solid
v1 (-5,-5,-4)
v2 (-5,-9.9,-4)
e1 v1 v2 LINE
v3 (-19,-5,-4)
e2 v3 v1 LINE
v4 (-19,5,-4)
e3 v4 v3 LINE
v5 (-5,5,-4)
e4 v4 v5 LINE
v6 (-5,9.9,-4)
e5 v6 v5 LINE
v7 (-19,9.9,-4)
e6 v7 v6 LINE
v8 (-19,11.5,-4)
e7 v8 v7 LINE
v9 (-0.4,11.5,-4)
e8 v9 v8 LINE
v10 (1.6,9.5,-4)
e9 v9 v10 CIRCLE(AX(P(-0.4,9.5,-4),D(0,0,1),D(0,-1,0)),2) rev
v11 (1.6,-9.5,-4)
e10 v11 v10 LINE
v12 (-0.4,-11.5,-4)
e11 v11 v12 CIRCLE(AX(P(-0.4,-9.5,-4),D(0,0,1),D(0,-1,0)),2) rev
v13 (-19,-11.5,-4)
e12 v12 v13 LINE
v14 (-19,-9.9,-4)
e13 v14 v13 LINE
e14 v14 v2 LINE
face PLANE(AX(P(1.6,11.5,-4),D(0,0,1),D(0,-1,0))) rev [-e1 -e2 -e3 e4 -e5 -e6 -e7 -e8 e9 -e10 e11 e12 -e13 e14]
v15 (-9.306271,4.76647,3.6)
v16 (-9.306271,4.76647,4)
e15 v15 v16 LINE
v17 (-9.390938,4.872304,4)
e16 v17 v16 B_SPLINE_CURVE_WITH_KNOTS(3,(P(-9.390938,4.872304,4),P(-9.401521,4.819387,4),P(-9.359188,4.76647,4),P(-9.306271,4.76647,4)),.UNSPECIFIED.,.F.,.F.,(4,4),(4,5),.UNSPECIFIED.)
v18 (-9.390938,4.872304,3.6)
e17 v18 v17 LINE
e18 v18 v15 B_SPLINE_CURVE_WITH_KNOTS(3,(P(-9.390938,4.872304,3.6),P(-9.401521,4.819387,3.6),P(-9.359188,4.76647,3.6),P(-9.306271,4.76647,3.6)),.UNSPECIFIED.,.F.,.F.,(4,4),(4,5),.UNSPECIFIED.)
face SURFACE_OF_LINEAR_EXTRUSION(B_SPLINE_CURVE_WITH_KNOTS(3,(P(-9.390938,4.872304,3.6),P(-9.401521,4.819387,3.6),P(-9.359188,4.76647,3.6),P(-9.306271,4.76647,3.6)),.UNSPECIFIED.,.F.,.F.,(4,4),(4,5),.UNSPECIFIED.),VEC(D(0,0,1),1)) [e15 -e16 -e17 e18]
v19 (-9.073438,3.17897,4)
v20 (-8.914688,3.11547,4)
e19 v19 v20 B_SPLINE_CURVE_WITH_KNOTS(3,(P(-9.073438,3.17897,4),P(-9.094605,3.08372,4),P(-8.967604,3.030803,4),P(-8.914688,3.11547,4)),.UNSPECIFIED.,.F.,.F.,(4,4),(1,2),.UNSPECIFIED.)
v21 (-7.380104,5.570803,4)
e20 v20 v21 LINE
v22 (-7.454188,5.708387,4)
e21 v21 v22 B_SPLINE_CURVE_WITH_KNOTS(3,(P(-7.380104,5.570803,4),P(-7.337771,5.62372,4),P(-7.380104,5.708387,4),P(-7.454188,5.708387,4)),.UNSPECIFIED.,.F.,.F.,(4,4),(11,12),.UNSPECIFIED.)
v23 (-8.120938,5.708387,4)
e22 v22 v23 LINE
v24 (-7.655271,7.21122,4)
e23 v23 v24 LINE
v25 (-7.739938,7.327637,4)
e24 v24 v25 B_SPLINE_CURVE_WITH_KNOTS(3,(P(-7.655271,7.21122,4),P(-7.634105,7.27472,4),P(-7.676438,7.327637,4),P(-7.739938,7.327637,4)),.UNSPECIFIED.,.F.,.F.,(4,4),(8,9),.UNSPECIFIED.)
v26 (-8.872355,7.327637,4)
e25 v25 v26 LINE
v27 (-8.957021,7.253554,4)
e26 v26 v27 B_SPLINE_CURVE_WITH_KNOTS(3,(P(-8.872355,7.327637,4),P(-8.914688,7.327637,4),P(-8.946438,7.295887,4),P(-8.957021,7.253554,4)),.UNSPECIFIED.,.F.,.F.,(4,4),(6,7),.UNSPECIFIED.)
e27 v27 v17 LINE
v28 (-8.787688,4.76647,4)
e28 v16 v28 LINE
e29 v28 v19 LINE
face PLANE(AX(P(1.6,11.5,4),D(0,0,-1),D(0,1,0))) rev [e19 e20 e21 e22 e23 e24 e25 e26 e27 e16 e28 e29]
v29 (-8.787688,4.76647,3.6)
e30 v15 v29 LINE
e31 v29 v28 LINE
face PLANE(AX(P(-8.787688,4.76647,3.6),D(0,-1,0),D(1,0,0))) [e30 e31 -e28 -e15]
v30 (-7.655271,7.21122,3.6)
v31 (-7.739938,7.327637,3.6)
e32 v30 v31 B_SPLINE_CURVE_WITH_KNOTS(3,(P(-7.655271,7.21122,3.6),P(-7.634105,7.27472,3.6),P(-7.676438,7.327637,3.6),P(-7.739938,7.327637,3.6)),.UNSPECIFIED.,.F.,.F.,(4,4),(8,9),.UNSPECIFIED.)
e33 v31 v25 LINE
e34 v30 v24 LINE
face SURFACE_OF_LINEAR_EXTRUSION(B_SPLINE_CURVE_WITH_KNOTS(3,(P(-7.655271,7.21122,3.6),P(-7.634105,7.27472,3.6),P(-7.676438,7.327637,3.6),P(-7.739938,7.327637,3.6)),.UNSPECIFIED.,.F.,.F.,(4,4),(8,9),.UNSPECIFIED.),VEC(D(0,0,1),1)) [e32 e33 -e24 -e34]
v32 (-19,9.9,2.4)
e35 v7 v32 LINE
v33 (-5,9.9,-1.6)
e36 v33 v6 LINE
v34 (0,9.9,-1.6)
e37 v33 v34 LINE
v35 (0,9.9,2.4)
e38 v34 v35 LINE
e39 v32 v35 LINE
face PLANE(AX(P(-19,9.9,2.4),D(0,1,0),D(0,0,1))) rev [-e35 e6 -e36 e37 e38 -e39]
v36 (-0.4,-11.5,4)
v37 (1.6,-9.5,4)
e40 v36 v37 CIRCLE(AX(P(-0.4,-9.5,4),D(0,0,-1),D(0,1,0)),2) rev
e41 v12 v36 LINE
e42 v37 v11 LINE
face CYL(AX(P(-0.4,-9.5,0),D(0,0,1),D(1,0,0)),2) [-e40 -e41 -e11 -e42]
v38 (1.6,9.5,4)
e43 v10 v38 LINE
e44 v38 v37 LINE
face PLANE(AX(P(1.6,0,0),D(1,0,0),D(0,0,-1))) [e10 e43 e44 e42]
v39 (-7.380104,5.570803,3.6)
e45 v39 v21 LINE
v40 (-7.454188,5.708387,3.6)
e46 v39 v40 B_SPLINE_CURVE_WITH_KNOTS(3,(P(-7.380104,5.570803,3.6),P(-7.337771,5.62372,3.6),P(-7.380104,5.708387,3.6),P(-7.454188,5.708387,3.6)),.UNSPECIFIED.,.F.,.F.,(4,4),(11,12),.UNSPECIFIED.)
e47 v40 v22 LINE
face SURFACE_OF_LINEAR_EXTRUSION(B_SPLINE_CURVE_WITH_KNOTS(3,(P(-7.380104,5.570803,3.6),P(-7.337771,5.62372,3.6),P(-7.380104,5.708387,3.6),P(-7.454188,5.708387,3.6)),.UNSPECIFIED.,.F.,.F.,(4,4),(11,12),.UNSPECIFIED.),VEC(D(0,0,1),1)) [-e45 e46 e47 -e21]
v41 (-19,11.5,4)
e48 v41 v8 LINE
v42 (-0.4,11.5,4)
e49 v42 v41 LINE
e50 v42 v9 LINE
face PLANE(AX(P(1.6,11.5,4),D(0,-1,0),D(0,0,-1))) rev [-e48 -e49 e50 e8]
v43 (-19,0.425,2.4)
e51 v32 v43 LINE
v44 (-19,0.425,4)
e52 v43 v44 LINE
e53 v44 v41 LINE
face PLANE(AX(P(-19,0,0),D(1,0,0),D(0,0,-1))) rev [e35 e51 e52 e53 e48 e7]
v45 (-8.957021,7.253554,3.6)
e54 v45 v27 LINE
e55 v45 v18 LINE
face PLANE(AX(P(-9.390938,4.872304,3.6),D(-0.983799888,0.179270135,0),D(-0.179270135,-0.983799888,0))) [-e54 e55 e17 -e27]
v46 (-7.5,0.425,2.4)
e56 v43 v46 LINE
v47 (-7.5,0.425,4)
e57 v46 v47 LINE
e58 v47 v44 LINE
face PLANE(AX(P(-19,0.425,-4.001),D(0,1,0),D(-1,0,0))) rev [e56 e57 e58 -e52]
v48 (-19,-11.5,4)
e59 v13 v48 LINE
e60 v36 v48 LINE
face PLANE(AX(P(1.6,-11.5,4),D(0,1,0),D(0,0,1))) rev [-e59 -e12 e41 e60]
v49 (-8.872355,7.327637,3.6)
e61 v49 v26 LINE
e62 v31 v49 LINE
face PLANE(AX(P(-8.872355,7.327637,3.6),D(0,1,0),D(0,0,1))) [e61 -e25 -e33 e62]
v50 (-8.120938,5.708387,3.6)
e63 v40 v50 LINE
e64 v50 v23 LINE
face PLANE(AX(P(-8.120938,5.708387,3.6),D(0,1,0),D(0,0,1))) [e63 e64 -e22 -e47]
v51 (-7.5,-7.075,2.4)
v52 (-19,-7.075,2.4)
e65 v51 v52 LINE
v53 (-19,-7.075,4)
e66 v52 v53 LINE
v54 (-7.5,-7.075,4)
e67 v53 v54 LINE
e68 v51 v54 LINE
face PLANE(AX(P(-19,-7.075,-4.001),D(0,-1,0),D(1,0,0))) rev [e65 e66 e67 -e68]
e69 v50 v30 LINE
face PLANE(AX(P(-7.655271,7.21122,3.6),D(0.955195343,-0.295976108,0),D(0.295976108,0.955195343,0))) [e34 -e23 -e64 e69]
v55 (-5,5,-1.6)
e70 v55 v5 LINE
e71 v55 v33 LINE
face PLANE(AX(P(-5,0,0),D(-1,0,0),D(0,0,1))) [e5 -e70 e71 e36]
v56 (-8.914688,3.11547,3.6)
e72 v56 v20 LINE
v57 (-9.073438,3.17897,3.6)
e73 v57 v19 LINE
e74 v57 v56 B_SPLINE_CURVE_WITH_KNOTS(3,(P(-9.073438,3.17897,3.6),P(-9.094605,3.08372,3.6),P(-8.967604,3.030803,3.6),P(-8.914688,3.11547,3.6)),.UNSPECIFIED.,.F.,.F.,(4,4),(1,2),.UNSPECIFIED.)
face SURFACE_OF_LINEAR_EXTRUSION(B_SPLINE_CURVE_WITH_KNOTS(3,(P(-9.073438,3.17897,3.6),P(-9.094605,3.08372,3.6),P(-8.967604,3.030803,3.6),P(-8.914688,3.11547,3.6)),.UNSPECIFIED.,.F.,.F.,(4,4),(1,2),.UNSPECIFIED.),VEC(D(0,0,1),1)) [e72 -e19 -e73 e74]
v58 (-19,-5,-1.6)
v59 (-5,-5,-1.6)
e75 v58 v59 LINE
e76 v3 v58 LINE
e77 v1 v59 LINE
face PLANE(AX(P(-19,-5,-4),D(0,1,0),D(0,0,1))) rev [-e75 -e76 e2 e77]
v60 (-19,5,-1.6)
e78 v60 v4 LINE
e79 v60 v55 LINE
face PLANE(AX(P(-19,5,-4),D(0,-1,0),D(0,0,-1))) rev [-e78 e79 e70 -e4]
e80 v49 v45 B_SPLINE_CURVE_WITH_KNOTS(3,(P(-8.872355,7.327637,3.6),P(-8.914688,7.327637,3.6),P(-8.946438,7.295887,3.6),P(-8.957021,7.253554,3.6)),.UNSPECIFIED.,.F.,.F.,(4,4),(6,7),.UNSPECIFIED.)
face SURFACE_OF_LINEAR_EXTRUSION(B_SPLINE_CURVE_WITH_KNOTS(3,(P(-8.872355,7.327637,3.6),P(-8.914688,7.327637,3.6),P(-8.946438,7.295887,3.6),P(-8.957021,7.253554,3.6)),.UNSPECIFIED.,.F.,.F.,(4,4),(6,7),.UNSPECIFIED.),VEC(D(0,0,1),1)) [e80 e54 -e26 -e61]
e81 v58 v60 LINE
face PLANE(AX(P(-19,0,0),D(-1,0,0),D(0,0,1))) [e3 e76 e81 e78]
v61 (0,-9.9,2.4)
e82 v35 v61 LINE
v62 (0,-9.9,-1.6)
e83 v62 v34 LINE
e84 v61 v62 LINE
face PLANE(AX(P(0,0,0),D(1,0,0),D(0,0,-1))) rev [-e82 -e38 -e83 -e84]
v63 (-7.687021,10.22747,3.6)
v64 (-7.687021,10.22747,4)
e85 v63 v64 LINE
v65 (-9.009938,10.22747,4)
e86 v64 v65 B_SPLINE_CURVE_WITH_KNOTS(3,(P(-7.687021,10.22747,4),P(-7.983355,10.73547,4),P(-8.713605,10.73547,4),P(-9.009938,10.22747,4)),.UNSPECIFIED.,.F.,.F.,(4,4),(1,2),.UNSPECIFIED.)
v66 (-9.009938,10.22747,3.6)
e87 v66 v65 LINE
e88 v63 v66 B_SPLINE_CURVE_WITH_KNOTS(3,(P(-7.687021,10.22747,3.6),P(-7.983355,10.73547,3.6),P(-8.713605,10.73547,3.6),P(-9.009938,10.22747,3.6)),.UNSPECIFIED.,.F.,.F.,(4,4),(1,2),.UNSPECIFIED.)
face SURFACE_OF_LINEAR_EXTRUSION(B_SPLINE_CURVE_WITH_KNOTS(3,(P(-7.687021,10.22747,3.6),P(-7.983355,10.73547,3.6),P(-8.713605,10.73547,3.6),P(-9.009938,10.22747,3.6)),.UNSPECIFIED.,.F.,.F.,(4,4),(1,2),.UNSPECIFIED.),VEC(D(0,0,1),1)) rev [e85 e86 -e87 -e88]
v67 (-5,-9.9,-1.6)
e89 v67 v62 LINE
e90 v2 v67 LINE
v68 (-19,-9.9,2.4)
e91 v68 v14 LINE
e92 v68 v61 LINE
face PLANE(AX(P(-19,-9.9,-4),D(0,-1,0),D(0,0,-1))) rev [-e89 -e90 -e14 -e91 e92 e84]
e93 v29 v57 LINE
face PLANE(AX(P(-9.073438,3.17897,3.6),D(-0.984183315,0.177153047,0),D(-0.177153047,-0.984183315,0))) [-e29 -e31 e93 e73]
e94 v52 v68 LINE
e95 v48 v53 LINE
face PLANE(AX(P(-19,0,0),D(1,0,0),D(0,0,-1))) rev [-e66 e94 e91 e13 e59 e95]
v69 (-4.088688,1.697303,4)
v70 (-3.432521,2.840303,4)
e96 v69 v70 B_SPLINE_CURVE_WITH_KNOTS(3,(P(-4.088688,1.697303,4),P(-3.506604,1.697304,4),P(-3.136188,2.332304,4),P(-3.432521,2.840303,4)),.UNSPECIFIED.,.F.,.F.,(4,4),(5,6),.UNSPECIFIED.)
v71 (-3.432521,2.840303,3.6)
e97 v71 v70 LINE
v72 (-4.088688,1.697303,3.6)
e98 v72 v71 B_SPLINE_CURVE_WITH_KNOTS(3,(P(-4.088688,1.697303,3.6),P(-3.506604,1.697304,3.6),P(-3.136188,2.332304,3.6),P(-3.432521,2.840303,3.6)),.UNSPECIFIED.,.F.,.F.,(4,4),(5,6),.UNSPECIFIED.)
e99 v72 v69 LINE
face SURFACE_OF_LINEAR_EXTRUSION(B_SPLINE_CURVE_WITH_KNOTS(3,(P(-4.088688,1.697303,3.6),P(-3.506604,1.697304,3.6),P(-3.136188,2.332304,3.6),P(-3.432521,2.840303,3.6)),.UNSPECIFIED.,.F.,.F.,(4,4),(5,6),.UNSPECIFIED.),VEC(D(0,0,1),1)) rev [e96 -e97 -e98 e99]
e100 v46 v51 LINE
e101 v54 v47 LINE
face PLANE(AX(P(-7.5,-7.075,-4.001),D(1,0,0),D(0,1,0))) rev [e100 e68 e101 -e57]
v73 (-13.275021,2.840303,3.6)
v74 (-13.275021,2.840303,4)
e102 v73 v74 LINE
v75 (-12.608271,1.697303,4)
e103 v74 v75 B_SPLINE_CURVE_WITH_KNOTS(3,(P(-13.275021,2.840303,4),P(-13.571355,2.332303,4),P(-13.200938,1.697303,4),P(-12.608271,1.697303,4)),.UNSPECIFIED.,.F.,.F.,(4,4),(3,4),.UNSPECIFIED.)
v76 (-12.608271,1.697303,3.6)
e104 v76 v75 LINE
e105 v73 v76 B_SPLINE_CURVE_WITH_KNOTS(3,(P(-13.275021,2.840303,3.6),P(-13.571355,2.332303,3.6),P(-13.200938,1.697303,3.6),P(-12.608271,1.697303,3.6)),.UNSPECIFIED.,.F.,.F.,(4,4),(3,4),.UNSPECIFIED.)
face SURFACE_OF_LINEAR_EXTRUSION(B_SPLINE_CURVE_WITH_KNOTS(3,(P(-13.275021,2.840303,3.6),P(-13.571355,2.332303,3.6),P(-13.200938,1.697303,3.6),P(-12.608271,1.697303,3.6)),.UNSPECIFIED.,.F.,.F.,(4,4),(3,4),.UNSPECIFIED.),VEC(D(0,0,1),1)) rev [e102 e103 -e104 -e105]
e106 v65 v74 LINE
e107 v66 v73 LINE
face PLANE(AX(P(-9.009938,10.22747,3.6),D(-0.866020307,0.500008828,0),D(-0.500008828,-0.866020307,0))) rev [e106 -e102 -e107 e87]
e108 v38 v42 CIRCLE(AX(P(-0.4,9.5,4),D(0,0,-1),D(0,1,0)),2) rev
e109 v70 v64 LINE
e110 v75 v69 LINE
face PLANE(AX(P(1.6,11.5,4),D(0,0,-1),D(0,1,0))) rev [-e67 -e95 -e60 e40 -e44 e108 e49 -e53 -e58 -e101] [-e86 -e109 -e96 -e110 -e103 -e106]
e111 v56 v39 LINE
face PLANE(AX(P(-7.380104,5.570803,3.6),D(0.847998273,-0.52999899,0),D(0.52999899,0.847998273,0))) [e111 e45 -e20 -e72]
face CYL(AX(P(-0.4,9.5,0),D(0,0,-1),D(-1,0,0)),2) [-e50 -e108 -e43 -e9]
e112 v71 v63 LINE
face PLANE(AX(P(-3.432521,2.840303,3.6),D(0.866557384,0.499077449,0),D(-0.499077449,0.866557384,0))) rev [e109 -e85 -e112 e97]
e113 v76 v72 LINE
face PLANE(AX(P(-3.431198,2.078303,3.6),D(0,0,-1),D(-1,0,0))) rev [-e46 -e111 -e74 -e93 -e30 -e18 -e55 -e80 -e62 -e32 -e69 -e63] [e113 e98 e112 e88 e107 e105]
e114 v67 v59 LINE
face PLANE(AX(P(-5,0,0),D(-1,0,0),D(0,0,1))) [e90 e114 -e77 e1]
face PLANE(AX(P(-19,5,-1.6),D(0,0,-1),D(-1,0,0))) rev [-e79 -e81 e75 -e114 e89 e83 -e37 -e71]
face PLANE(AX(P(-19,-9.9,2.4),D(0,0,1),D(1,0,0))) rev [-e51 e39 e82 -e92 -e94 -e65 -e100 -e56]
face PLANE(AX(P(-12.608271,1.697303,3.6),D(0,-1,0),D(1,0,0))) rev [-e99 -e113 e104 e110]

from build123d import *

# Parameters (mm, degrees)
ESQUISSE1_W             = 8
ESQUISSE1_H             = 23
BOSS_EXTRU_1_DEPTH      = 1.6
ESQUISSE2_W             = 2.4
ESQUISSE2_H             = 10
BOSS_EXTRU_2_DEPTH      = 19
ESQUISSE3_W             = 2.4
ESQUISSE3_H             = 19.8
BOSS_EXTRU_3_DEPTH      = 5
ENL_V_MAT_EXTRU_1_REACH = 25.606
ESQUISSE4_W             = 11.5
ESQUISSE4_H             = 7.5
ENL_V_START             = -0.4
ENL_V_MAT_EXTRU_2_DEPTH = 0.4
CONG_1_R                = 2


# Read off the part's stored shape, not the designer's step: Enlèv. mat.-Extru.2
with BuildPart() as part:
    # Esquisse1 → Boss.-Extru.1 (new body)
    with BuildSketch(Plane(origin=(0, 0, 0), x_dir=(0, 0, -1), z_dir=(1, 0, 0))):
        Rectangle(ESQUISSE1_W, ESQUISSE1_H)
    extrude(amount=BOSS_EXTRU_1_DEPTH)

    # Esquisse2 → Boss.-Extru.2 (add)
    with BuildSketch(Plane.ZY):
        Polygon((-4, 11.5), (4, 11.5), (4, -11.5), (-4, -11.5), (-4, -9.9), (2.4, -9.9), (2.4, 9.9), (-4, 9.9), align=None)
        with Locations((-2.8, 0)):
            Rectangle(ESQUISSE2_W, ESQUISSE2_H)
    extrude(amount=BOSS_EXTRU_2_DEPTH)

    # Esquisse3 → Boss.-Extru.3 (add)
    with BuildSketch(Plane.ZY):
        with Locations((-2.8, 0)):
            Rectangle(ESQUISSE3_W, ESQUISSE3_H)
    extrude(amount=BOSS_EXTRU_3_DEPTH)

    # Esquisse4 → Enlèv. mat.-Extru.1 (cut, up to next)
    with BuildSketch(Plane.XY.offset(4), mode=Mode.PRIVATE) as enl_v_mat_extru_1_sk1:
        with Locations((-13.25, -3.325)):
            Rectangle(ESQUISSE4_W, ESQUISSE4_H)
    enl_v_mat_extru_1_tool1 = extrude(enl_v_mat_extru_1_sk1.sketch, amount=-ENL_V_MAT_EXTRU_1_REACH, mode=Mode.PRIVATE) & part.part
    add(enl_v_mat_extru_1_tool1.solids().sort_by_distance((-13.25, -3.325, 4))[0], mode=Mode.SUBTRACT)

    # Enlèv. mat.-Extru.2 outline → Enlèv. mat.-Extru.2 (cut)
    with BuildSketch(Plane.XY.offset(4).offset(ENL_V_START)):
        with BuildLine():
            Line((-12.608271193, 1.69730271), (-4.088687559, 1.69730271))
            add(Edge.make_bspline(
                [(-4.088687559, 1.69730271), (-3.506604225, 1.697303518), (-3.136187559, 2.332303518), (-3.432521215, 2.840303033)],
                knots=[5, 5, 5, 5, 6, 6, 6, 6], degree=3))
            Line((-3.432521215, 2.840303033), (-7.687021295, 10.227470021))
            add(Edge.make_bspline(
                [(-7.687021295, 10.227470021), (-7.983354547, 10.735470041), (-8.713604709, 10.735470041), (-9.009937961, 10.227470021)],
                knots=[1, 1, 1, 1, 2, 2, 2, 2], degree=3))
            Line((-9.009937961, 10.227470021), (-13.275021213, 2.840303033))
            add(Edge.make_bspline(
                [(-13.275021213, 2.840303033), (-13.571354541, 2.33230271), (-13.200937899, 1.69730271), (-12.608271193, 1.69730271)],
                knots=[3, 3, 3, 3, 4, 4, 4, 4], degree=3))
        make_face()
        with BuildLine():
            add(Edge.make_bspline(
                [(-7.380104467, 5.570803355), (-7.337771376, 5.623720022), (-7.380104467, 5.708386608), (-7.454188284, 5.708387012)],
                knots=[11, 11, 11, 11, 12, 12, 12, 12], degree=3))
            Line((-7.380104467, 5.570803355), (-8.9146878, 3.115470345))
            add(Edge.make_bspline(
                [(-9.0734378, 3.178970184), (-9.094604547, 3.083720023), (-8.967604466, 3.030803356), (-8.9146878, 3.115470345)],
                knots=[1, 1, 1, 1, 2, 2, 2, 2], degree=3))
            Line((-9.0734378, 3.178970184), (-8.787687719, 4.766470184))
            Line((-8.787687719, 4.766470184), (-9.306271214, 4.766470184))
            add(Edge.make_bspline(
                [(-9.390937799, 4.872303517), (-9.401521375, 4.81938685), (-9.35918788, 4.766470184), (-9.306271214, 4.766470184)],
                knots=[4, 4, 4, 4, 5, 5, 5, 5], degree=3))
            Line((-9.390937799, 4.872303517), (-8.957021294, 7.253553516))
            add(Edge.make_bspline(
                [(-8.872354708, 7.32763693), (-8.9146878, 7.32763693), (-8.946438123, 7.295887011), (-8.957021294, 7.253553516)],
                knots=[6, 6, 6, 6, 7, 7, 7, 7], degree=3))
            Line((-8.872354708, 7.32763693), (-7.739937961, 7.32763693))
            add(Edge.make_bspline(
                [(-7.655271375, 7.211220425), (-7.634104628, 7.274720264), (-7.676438123, 7.32763693), (-7.739937961, 7.32763693)],
                knots=[8, 8, 8, 8, 9, 9, 9, 9], degree=3))
            Line((-7.655271375, 7.211220425), (-8.120938204, 5.708387012))
            Line((-8.120938204, 5.708387012), (-7.454188284, 5.708387012))
        make_face(mode=Mode.SUBTRACT)
    extrude(amount=ENL_V_MAT_EXTRU_2_DEPTH, mode=Mode.SUBTRACT)

    # Congé1
    cong_1_edges = [part.edges().sort_by_distance(p)[0] for p in [
        (1.6, -11.5, 0),
        (1.6, 11.5, 0),
    ]]
    fillet(cong_1_edges, radius=CONG_1_R)


solid = part.part
